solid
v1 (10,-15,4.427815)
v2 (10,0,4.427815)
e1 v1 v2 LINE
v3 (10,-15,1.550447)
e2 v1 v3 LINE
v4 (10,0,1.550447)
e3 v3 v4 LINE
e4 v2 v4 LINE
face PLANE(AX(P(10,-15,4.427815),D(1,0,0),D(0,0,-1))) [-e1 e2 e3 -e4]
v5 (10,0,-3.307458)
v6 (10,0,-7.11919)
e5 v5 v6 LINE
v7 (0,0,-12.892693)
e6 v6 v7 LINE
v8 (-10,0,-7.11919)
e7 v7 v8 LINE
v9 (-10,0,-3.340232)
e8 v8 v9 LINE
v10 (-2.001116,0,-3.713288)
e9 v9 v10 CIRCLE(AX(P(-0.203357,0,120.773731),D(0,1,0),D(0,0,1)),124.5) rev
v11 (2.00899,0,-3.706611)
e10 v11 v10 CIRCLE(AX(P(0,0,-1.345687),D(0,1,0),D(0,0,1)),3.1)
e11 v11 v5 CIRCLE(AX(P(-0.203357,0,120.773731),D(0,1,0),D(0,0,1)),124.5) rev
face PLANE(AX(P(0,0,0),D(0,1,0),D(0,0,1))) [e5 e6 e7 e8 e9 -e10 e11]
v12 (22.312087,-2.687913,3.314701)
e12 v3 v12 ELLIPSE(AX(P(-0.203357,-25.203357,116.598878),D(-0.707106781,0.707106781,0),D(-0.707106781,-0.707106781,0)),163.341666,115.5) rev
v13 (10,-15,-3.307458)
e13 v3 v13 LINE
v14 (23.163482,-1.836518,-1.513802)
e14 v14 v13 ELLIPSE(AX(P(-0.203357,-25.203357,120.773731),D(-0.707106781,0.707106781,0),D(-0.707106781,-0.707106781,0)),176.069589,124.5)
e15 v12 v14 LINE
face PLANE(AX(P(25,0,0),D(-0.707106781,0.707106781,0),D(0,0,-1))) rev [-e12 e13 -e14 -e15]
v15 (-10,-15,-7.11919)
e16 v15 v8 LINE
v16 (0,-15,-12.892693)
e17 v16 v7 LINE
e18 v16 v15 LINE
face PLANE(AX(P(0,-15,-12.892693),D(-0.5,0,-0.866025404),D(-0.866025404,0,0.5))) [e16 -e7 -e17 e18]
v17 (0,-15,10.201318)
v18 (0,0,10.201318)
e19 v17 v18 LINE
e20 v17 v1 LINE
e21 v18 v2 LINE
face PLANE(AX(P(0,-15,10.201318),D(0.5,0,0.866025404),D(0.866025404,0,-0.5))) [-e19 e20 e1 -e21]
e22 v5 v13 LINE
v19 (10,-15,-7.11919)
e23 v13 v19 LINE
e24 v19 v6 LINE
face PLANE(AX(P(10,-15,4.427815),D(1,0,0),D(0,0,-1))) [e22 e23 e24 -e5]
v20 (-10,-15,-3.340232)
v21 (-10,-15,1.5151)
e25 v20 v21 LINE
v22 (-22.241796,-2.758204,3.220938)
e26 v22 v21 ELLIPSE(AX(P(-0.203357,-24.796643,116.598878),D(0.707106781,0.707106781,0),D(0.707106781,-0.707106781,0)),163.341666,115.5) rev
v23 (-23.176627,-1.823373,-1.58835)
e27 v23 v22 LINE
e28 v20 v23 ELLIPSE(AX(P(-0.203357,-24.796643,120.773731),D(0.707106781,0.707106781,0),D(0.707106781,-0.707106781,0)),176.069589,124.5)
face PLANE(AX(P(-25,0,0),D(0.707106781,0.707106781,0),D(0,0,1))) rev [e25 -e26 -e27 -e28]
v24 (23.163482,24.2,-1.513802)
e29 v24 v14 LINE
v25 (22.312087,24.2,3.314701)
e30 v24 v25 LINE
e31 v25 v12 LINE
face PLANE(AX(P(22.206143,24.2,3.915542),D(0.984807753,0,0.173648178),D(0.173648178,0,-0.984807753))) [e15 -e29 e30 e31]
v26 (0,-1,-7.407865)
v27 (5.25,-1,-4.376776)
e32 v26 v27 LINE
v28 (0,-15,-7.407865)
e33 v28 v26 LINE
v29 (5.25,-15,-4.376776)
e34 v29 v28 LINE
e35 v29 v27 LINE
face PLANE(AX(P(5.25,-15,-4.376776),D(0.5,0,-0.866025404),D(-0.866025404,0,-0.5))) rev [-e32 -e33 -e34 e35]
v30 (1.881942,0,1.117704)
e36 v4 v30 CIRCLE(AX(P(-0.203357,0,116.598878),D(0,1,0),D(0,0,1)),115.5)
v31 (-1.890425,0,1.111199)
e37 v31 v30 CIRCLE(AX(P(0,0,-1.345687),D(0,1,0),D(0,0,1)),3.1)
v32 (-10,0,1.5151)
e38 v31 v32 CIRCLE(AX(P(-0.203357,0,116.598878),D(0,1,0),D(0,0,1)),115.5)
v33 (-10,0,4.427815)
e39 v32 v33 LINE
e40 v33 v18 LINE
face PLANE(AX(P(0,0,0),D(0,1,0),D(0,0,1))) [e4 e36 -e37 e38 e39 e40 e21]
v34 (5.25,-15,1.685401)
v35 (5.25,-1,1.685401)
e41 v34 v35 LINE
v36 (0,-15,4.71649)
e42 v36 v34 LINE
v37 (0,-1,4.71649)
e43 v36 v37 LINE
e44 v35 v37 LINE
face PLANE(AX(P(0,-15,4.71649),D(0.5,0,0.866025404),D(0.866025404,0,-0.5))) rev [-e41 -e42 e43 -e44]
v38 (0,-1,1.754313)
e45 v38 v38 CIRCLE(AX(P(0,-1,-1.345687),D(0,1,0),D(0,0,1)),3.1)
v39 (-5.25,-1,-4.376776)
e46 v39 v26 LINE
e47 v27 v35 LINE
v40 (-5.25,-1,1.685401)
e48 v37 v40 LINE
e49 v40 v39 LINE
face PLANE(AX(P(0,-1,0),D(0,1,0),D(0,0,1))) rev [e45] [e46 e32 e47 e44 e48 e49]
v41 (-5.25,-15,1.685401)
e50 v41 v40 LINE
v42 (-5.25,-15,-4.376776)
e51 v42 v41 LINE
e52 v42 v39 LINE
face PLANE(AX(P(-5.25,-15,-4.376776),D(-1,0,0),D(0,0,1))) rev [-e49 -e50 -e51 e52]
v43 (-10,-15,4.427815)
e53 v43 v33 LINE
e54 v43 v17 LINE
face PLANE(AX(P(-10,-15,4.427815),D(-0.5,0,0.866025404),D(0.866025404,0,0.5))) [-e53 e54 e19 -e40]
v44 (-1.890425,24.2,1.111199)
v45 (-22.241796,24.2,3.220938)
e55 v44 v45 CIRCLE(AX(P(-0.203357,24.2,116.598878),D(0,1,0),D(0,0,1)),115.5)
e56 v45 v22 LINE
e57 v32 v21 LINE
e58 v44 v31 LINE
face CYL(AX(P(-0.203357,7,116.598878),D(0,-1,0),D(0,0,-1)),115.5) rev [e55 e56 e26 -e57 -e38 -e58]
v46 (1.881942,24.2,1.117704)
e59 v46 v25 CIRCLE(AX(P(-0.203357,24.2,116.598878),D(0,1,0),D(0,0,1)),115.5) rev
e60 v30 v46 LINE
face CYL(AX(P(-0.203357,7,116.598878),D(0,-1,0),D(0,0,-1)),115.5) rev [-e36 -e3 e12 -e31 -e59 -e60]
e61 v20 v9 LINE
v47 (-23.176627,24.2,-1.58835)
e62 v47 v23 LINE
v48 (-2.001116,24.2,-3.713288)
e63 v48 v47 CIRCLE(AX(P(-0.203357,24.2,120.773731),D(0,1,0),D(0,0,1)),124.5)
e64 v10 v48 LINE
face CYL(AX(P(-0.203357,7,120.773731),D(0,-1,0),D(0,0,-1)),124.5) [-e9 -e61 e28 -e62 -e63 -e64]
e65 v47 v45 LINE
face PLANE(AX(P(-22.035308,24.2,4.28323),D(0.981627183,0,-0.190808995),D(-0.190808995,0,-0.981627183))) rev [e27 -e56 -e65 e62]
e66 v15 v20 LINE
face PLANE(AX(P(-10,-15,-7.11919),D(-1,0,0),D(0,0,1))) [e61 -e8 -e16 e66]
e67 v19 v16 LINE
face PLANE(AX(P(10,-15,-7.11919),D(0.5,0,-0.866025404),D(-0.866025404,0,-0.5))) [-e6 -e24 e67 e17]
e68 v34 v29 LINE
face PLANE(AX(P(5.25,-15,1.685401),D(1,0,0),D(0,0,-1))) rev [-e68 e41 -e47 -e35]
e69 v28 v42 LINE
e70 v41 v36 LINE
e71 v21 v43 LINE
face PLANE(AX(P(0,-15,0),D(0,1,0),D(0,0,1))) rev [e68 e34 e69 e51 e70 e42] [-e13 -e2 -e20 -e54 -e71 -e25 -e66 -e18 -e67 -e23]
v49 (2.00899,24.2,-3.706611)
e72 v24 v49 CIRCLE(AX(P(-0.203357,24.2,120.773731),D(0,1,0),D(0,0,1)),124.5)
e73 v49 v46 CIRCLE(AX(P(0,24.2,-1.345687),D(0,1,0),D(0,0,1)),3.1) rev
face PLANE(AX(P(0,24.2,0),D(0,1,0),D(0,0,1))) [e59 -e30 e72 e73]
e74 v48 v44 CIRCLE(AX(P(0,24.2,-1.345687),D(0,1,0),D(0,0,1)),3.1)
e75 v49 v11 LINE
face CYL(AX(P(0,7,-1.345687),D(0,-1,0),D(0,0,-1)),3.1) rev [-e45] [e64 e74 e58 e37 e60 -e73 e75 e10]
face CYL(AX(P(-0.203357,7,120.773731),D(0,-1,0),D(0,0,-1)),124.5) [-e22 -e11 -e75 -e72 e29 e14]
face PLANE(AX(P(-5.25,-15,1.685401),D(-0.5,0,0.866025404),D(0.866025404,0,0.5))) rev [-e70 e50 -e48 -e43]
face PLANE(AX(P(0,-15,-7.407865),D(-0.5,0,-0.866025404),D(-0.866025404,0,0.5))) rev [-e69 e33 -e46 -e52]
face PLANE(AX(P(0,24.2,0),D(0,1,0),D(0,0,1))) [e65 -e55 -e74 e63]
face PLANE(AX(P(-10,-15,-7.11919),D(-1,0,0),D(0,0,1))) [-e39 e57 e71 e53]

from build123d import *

# Parameters (mm, degrees)
BOSS_EXTRUDE1_DEPTH     = 7
BOSS_EXTRUDE3_DEPTH     = 15
BOSS_EXTRUDE4_DEPTH     = 1
CUT_EXTRUDE1_DEPTH      = 33.699933964
CUT_EXTRUDE1_DEPTH_BACK = 33.699933964
SKETCH2_R               = 3.1
BOSS_EXTRUDE5_DEPTH     = 17.2
CUT_EXTRUDE3_DEPTH      = 37.841358298
CUT_EXTRUDE3_DEPTH_BACK = 37.841358298
CHAMFER1_SIZE           = 15


with BuildPart() as part:
    # Sketch1 → Boss-Extrude1 (new body)
    with BuildSketch(Plane(origin=(0, 0, 0), x_dir=(1, 0, 0), z_dir=(0, 1, 0))):
        with BuildLine():
            Line((-26.590677944, 0.897790933), (-24.677260394, -3.721607667))
            ThreePointArc((-24.677260394, -3.721607667), (-0.012479526, -1.099035349), (24.643498383, -3.80311637))
            Line((24.643498383, -3.80311637), (26.537632348, 0.769727537))
            ThreePointArc((26.537632348, 0.769727537), (26.536056466, 0.805424146), (26.507677261, 0.827134789))
            ThreePointArc((26.507677261, 0.827134789), (-0.03768972, 3.726158505), (-26.590677944, 0.897790933))
        make_face()
    extrude(amount=BOSS_EXTRUDE1_DEPTH)

    # Sketch1<4> → Boss-Extrude3 (add)
    with BuildSketch(Plane(origin=(0, 0, 0), x_dir=(1, 0, 0), z_dir=(0, 1, 0))):
        Polygon((0, 12.892692804), (-10, 7.119190112), (-10, -4.427815272), (0, -10.201317964), (10, -4.427815272), (10, 7.119190112), align=None)
        Polygon((0, 7.407865247), (-5.25, 4.376776333), (-5.25, -1.685401493), (0, -4.716490406), (5.25, -1.685401493), (5.25, 4.376776333), align=None, mode=Mode.SUBTRACT)
    extrude(amount=-BOSS_EXTRUDE3_DEPTH)

    # Sketch1<5> → Boss-Extrude4 (add)
    with BuildSketch(Plane(origin=(0, 0, 0), x_dir=(1, 0, 0), z_dir=(0, 1, 0))):
        Polygon((0, 12.892692804), (-10, 7.119190112), (-10, -4.427815272), (0, -10.201317964), (10, -4.427815272), (10, 7.119190112), align=None)
    extrude(amount=-BOSS_EXTRUDE4_DEPTH)

    # Sketch2 → Cut-Extrude1 (cut, two sides: drawn at the far end of the back side and taken through both)
    with BuildSketch(Plane.XZ.offset(1).offset(-CUT_EXTRUDE1_DEPTH_BACK)):
        with Locations(Location((0, -1.34568742, 0), (0, 0, 229.79522624))):
            Circle(SKETCH2_R)
    extrude(amount=CUT_EXTRUDE1_DEPTH + CUT_EXTRUDE1_DEPTH_BACK, mode=Mode.SUBTRACT)

    # Sketch3 → Boss-Extrude5 (add)
    with BuildSketch(Plane(origin=(0, 7, 0), x_dir=(1, 0, 0), z_dir=(0, 1, 0))):
        with BuildLine():
            ThreePointArc((-1.890425019, -1.111199481), (-12.112919314, -1.714534324), (-22.241796383, -3.220937936))
            Line((-22.241796383, -3.220937936), (-23.176627213, 1.588349763))
            ThreePointArc((-23.176627213, 1.588349763), (-12.634359148, 3.104112575), (-2.001116102, 3.713288389))
            ThreePointArc((-2.001116102, 3.713288389), (-3.099184389, 1.274580997), (-1.890425019, -1.111199481))
        make_face()
        with BuildLine():
            Line((22.31208714, -3.314700634), (23.163482432, 1.513802008))
            ThreePointArc((23.163482432, 1.513802008), (22.130674577, 1.706638646), (21.096276164, 1.890752624))
            ThreePointArc((21.096276164, 1.890752624), (11.587641271, 3.166667106), (2.008990202, 3.706610623))
            ThreePointArc((2.008990202, 3.706610623), (3.098925579, 1.264077023), (1.881941585, -1.117703712))
            ThreePointArc((1.881941585, -1.117703712), (12.145968264, -1.760973798), (22.31208714, -3.314700634))
        make_face()
    extrude(amount=BOSS_EXTRUDE5_DEPTH)

    # Sketch4 → Cut-Extrude3 (cut, two sides: drawn at the far end of the back side and taken through both)
    with BuildSketch(Plane(origin=(0, 7, 0), x_dir=(1, 0, 0), z_dir=(0, 1, 0)).offset(-CUT_EXTRUDE3_DEPTH_BACK)):
        with BuildLine():
            Line((23.163482432, 1.513802008), (22.31208714, -3.314700634))
            ThreePointArc((22.31208714, -3.314700634), (23.479051904, -3.552898091), (24.643498383, -3.80311637))
            Line((24.643498383, -3.80311637), (26.537632348, 0.769727537))
            ThreePointArc((26.537632348, 0.769727537), (26.536056466, 0.805424146), (26.507677261, 0.827134789))
            ThreePointArc((26.507677261, 0.827134789), (24.837933629, 1.181931749), (23.163482432, 1.513802008))
        make_face()
        with BuildLine():
            Line((-22.241796383, -3.220937936), (-23.176627213, 1.588349763))
            ThreePointArc((-23.176627213, 1.588349763), (-24.886067704, 1.255010478), (-26.590677944, 0.897790933))
            Line((-26.590677944, 0.897790933), (-24.677260394, -3.721607667))
            ThreePointArc((-24.677260394, -3.721607667), (-23.460875681, -3.464719015), (-22.241796383, -3.220937936))
        make_face()
    extrude(amount=CUT_EXTRUDE3_DEPTH + CUT_EXTRUDE3_DEPTH_BACK, mode=Mode.SUBTRACT)

    # Chamfer1
    # the kernel refuses this chamfer: 15 mm, written as the material it adds along each edge
    with BuildSketch(Plane(origin=(10, 0, 40.125691349), x_dir=(0.9996219169112966, 0.027495876610586365, 0), z_dir=(0, 0, -1))) as chamfer1_piece_1_section:
        Polygon((CHAMFER1_SIZE * 0.999621916911, CHAMFER1_SIZE * 0.0274958766106), (-CHAMFER1_SIZE * 0.0274958766106, CHAMFER1_SIZE * 0.999621916911), (0, 0), align=None)
    chamfer1_piece_1 = extrude(amount=82.008394033, mode=Mode.PRIVATE)
    chamfer1_piece_1 = chamfer1_piece_1 - Plane(origin=(-0.203357417, -3.100629743, 116.598877624), x_dir=(-0.21189526386996682, 0, -0.9772923805849901), z_dir=(0, -1, 0)) * Cylinder(115.5, 224, mode=Mode.PRIVATE)
    chamfer1_piece_1 = split(chamfer1_piece_1, bisect_by=Plane(origin=(22.567978143, -3.100629743, 1.863470638), z_dir=(-0.9848077530122092, 0, -0.17364817766692403)), keep=Keep.TOP, mode=Mode.PRIVATE)
    chamfer1_piece_1 = chamfer1_piece_1 & Plane(origin=(-0.203357417, -3.100629743, 120.773731271), x_dir=(0.21454646327949964, 0, -0.9767137836102542), z_dir=(0, -1, 0)) * Cylinder(124.5, 224, mode=Mode.PRIVATE)
    add(chamfer1_piece_1)
    with BuildSketch(Plane(origin=(-10, 0, -41.915476478), x_dir=(0.02749587661058632, -0.9996219169112968, 0), z_dir=(0, 0, 1))) as chamfer1_piece_2_section:
        Polygon((CHAMFER1_SIZE * 0.999621916911, -CHAMFER1_SIZE * 0.0274958766106), (-CHAMFER1_SIZE * 0.0274958766106, -CHAMFER1_SIZE * 0.999621916911), (0, 0), align=None)
    chamfer1_piece_2 = extrude(amount=82.005821637, mode=Mode.PRIVATE)
    chamfer1_piece_2 = chamfer1_piece_2 & Plane(origin=(-0.203357417, -2.670719626, 120.773731271), x_dir=(0.21454646327949964, 0, -0.9767137836102542), z_dir=(0, -1, 0)) * Cylinder(124.5, 224, mode=Mode.PRIVATE)
    chamfer1_piece_2 = chamfer1_piece_2 - Plane(origin=(-0.203357417, -2.670719626, 116.598877624), x_dir=(-0.21189526386996682, 0, -0.9772923805849901), z_dir=(0, -1, 0)) * Cylinder(115.5, 224, mode=Mode.PRIVATE)
    chamfer1_piece_2 = split(chamfer1_piece_2, bisect_by=Plane(origin=(-23.112985585, -2.670719626, -1.260941971), z_dir=(0.9816271834476646, 0, -0.1908089953765415)), keep=Keep.TOP, mode=Mode.PRIVATE)
    add(chamfer1_piece_2)


solid = part.part
